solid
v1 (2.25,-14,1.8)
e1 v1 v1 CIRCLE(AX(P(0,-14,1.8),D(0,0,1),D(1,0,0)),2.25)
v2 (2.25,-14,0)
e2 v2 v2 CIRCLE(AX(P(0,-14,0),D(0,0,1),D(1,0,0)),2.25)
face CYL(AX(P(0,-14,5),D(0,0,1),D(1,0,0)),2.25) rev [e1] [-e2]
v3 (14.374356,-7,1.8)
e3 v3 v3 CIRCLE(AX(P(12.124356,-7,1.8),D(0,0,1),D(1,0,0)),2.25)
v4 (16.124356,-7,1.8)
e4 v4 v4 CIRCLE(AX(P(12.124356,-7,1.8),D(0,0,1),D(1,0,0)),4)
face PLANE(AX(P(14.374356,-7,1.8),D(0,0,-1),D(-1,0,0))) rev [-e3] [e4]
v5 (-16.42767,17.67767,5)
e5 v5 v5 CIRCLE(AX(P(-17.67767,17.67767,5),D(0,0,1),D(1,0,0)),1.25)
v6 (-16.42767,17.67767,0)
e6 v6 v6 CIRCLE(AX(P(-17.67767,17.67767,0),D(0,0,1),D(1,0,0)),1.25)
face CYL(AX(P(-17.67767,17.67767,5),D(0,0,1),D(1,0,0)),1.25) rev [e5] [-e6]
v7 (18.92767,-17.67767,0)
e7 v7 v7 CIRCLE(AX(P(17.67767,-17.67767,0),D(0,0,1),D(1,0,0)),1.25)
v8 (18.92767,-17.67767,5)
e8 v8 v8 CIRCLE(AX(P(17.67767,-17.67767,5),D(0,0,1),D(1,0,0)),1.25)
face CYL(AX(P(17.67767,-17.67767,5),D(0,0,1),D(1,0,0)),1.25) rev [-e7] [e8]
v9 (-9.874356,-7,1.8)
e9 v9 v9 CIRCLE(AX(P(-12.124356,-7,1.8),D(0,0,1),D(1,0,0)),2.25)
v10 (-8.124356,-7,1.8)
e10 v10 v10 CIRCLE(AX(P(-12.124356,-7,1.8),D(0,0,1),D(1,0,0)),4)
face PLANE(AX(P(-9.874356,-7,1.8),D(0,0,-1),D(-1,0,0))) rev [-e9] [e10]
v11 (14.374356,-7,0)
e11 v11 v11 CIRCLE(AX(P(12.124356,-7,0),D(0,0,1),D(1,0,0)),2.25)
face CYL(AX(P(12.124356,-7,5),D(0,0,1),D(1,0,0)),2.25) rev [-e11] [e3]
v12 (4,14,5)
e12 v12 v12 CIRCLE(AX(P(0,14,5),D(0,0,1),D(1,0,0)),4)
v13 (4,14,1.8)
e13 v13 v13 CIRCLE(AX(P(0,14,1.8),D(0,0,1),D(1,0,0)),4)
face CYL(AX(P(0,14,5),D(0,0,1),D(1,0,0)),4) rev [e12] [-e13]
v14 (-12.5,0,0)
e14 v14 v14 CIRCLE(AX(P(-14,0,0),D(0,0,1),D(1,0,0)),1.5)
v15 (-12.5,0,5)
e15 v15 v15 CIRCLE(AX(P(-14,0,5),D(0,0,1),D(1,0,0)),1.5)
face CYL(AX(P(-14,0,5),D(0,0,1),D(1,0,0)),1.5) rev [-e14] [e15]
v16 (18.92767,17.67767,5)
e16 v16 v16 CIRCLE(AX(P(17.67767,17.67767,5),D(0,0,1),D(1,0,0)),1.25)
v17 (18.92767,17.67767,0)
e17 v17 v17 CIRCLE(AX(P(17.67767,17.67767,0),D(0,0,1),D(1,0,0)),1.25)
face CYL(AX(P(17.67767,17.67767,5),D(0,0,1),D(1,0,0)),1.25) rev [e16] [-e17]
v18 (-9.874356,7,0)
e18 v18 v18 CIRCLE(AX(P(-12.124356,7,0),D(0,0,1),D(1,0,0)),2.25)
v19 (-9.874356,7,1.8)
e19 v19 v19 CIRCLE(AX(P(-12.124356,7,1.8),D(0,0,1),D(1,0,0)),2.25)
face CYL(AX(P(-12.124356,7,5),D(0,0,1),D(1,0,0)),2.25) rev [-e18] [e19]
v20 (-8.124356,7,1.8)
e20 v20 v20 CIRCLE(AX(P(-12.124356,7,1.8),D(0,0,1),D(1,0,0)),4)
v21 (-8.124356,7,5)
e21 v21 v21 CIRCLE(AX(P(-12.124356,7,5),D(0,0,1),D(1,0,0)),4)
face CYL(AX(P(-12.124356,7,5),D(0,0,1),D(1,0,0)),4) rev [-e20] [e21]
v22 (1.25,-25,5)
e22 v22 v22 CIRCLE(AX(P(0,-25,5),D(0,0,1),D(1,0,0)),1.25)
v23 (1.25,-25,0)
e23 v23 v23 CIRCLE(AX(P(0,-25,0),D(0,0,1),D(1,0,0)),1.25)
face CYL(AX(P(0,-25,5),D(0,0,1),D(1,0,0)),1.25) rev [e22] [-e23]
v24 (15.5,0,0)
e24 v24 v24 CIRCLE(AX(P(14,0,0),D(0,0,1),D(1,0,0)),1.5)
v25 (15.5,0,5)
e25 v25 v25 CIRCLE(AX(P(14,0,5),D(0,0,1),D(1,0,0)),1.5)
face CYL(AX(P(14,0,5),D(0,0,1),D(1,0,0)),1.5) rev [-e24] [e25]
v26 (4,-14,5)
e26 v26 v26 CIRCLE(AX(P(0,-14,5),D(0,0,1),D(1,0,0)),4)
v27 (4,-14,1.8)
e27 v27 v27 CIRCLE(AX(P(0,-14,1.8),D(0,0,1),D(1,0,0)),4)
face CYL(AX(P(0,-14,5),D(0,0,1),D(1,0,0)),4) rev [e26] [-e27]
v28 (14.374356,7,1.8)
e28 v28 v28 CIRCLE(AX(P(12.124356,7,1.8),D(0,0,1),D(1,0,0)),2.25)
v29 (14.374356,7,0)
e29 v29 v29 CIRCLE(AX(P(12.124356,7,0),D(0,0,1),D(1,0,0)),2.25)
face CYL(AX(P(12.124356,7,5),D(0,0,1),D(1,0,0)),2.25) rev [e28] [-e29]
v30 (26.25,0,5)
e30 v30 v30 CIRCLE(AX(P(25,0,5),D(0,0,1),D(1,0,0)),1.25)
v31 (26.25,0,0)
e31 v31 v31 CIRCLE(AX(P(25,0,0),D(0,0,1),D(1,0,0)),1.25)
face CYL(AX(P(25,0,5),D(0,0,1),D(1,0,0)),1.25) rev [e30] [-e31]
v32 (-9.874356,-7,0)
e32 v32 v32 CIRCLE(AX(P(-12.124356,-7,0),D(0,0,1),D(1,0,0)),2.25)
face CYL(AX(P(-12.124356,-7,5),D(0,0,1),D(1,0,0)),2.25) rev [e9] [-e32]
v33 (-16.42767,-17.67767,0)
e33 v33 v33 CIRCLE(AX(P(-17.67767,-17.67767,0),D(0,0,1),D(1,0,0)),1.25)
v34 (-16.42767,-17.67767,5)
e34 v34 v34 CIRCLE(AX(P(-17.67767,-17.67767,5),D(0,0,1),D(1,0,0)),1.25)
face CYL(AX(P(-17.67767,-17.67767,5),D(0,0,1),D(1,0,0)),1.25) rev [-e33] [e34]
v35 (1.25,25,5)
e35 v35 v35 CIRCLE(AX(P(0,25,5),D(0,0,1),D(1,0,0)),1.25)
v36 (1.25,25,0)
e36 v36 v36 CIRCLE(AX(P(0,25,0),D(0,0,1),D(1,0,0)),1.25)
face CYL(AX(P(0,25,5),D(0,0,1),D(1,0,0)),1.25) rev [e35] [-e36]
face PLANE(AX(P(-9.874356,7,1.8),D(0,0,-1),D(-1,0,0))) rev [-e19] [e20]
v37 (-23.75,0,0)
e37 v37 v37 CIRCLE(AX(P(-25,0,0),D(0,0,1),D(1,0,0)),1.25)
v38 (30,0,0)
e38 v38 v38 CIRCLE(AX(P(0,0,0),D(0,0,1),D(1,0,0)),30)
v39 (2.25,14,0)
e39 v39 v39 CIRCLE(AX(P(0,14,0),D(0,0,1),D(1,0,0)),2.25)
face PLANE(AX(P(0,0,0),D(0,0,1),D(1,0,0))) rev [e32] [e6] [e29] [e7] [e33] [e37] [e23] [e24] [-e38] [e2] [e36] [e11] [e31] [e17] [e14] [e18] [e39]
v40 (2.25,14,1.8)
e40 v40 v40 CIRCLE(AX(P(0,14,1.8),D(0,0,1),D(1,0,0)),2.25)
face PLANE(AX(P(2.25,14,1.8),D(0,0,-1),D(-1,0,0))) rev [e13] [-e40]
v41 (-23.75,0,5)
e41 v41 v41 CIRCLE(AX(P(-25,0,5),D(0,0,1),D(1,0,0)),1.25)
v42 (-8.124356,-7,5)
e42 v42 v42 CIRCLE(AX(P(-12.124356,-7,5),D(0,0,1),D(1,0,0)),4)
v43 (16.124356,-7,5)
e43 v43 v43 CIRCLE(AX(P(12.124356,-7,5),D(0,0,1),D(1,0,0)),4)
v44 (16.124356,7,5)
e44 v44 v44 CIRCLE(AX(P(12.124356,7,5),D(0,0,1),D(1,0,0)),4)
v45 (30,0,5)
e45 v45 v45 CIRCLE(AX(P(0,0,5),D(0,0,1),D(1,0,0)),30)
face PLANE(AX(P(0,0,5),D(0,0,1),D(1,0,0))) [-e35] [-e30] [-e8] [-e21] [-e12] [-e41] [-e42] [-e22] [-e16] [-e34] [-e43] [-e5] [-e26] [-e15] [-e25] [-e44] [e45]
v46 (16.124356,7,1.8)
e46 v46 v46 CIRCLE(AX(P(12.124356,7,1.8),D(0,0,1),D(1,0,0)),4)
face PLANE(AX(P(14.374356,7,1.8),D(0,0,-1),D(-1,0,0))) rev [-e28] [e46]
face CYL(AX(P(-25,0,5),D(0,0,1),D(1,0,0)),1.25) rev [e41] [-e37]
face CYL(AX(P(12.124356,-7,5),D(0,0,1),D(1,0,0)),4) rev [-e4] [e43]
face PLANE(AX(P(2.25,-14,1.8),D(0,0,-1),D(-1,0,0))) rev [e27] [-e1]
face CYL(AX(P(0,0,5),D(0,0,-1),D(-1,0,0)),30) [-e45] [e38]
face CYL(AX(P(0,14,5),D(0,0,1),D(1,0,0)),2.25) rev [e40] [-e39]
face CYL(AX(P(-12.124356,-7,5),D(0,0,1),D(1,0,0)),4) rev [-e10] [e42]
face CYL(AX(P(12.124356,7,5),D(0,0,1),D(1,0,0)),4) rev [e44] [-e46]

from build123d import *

# Parameters (mm, degrees)
SKETCH1_R                                            = 30
BOSS_EXTRUDE1_DEPTH                                  = 5
CBORE_FOR_M4_HEX_SOCKET_THIN_HEAD_CAP_SC_D           = 4.5
CBORE_FOR_M4_HEX_SOCKET_THIN_HEAD_CAP_SC_CBORE_D     = 8
CBORE_FOR_M4_HEX_SOCKET_THIN_HEAD_CAP_SC_CBORE_DEPTH = 3.2
F_3_0MM_DOWEL_HOLE1_OUTLINE_R                        = 1.5
F_3_0MM_DOWEL_HOLE1_DEPTH                            = 5
TAP_DRILL_FOR_M3_TAP1_D                              = 2.5


# Read off the part's stored shape, not the designer's step: Ø3.0mm Dowel Hole1
with BuildPart() as part:
    # Sketch1 → Boss-Extrude1 (new body)
    with BuildSketch(Plane.XY):
        Circle(SKETCH1_R)
    extrude(amount=BOSS_EXTRUDE1_DEPTH)

    # CBORE for M4 Hex Socket Thin Head Cap Screw1 (through all)
    with Locations(Plane.XY.offset(5)):
        with Locations((-12.124355653, 7), (0, 14), (12.124355653, 7), (12.124355653, -7), (0, -14), (-12.124355653, -7)):
            CounterBoreHole(CBORE_FOR_M4_HEX_SOCKET_THIN_HEAD_CAP_SC_D / 2, CBORE_FOR_M4_HEX_SOCKET_THIN_HEAD_CAP_SC_CBORE_D / 2, CBORE_FOR_M4_HEX_SOCKET_THIN_HEAD_CAP_SC_CBORE_DEPTH)

    # Ø3.0mm Dowel Hole1 outline → Ø3.0mm Dowel Hole1 (cut)
    with BuildSketch(Plane.XY):
        with Locations((14, 0)):
            Circle(F_3_0MM_DOWEL_HOLE1_OUTLINE_R)
        with Locations((-14, 0)):
            Circle(F_3_0MM_DOWEL_HOLE1_OUTLINE_R)
    extrude(amount=F_3_0MM_DOWEL_HOLE1_DEPTH, mode=Mode.SUBTRACT)

    # Tap Drill for M3 Tap1 (through all)
    with Locations(Plane.XY.offset(5)):
        with Locations((-17.67766953, 17.67766953), (0, 25), (17.67766953, 17.67766953), (25, 0), (17.67766953, -17.67766953), (0, -25), (-17.67766953, -17.67766953), (-25, 0)):
            Hole(TAP_DRILL_FOR_M3_TAP1_D / 2)


solid = part.part
